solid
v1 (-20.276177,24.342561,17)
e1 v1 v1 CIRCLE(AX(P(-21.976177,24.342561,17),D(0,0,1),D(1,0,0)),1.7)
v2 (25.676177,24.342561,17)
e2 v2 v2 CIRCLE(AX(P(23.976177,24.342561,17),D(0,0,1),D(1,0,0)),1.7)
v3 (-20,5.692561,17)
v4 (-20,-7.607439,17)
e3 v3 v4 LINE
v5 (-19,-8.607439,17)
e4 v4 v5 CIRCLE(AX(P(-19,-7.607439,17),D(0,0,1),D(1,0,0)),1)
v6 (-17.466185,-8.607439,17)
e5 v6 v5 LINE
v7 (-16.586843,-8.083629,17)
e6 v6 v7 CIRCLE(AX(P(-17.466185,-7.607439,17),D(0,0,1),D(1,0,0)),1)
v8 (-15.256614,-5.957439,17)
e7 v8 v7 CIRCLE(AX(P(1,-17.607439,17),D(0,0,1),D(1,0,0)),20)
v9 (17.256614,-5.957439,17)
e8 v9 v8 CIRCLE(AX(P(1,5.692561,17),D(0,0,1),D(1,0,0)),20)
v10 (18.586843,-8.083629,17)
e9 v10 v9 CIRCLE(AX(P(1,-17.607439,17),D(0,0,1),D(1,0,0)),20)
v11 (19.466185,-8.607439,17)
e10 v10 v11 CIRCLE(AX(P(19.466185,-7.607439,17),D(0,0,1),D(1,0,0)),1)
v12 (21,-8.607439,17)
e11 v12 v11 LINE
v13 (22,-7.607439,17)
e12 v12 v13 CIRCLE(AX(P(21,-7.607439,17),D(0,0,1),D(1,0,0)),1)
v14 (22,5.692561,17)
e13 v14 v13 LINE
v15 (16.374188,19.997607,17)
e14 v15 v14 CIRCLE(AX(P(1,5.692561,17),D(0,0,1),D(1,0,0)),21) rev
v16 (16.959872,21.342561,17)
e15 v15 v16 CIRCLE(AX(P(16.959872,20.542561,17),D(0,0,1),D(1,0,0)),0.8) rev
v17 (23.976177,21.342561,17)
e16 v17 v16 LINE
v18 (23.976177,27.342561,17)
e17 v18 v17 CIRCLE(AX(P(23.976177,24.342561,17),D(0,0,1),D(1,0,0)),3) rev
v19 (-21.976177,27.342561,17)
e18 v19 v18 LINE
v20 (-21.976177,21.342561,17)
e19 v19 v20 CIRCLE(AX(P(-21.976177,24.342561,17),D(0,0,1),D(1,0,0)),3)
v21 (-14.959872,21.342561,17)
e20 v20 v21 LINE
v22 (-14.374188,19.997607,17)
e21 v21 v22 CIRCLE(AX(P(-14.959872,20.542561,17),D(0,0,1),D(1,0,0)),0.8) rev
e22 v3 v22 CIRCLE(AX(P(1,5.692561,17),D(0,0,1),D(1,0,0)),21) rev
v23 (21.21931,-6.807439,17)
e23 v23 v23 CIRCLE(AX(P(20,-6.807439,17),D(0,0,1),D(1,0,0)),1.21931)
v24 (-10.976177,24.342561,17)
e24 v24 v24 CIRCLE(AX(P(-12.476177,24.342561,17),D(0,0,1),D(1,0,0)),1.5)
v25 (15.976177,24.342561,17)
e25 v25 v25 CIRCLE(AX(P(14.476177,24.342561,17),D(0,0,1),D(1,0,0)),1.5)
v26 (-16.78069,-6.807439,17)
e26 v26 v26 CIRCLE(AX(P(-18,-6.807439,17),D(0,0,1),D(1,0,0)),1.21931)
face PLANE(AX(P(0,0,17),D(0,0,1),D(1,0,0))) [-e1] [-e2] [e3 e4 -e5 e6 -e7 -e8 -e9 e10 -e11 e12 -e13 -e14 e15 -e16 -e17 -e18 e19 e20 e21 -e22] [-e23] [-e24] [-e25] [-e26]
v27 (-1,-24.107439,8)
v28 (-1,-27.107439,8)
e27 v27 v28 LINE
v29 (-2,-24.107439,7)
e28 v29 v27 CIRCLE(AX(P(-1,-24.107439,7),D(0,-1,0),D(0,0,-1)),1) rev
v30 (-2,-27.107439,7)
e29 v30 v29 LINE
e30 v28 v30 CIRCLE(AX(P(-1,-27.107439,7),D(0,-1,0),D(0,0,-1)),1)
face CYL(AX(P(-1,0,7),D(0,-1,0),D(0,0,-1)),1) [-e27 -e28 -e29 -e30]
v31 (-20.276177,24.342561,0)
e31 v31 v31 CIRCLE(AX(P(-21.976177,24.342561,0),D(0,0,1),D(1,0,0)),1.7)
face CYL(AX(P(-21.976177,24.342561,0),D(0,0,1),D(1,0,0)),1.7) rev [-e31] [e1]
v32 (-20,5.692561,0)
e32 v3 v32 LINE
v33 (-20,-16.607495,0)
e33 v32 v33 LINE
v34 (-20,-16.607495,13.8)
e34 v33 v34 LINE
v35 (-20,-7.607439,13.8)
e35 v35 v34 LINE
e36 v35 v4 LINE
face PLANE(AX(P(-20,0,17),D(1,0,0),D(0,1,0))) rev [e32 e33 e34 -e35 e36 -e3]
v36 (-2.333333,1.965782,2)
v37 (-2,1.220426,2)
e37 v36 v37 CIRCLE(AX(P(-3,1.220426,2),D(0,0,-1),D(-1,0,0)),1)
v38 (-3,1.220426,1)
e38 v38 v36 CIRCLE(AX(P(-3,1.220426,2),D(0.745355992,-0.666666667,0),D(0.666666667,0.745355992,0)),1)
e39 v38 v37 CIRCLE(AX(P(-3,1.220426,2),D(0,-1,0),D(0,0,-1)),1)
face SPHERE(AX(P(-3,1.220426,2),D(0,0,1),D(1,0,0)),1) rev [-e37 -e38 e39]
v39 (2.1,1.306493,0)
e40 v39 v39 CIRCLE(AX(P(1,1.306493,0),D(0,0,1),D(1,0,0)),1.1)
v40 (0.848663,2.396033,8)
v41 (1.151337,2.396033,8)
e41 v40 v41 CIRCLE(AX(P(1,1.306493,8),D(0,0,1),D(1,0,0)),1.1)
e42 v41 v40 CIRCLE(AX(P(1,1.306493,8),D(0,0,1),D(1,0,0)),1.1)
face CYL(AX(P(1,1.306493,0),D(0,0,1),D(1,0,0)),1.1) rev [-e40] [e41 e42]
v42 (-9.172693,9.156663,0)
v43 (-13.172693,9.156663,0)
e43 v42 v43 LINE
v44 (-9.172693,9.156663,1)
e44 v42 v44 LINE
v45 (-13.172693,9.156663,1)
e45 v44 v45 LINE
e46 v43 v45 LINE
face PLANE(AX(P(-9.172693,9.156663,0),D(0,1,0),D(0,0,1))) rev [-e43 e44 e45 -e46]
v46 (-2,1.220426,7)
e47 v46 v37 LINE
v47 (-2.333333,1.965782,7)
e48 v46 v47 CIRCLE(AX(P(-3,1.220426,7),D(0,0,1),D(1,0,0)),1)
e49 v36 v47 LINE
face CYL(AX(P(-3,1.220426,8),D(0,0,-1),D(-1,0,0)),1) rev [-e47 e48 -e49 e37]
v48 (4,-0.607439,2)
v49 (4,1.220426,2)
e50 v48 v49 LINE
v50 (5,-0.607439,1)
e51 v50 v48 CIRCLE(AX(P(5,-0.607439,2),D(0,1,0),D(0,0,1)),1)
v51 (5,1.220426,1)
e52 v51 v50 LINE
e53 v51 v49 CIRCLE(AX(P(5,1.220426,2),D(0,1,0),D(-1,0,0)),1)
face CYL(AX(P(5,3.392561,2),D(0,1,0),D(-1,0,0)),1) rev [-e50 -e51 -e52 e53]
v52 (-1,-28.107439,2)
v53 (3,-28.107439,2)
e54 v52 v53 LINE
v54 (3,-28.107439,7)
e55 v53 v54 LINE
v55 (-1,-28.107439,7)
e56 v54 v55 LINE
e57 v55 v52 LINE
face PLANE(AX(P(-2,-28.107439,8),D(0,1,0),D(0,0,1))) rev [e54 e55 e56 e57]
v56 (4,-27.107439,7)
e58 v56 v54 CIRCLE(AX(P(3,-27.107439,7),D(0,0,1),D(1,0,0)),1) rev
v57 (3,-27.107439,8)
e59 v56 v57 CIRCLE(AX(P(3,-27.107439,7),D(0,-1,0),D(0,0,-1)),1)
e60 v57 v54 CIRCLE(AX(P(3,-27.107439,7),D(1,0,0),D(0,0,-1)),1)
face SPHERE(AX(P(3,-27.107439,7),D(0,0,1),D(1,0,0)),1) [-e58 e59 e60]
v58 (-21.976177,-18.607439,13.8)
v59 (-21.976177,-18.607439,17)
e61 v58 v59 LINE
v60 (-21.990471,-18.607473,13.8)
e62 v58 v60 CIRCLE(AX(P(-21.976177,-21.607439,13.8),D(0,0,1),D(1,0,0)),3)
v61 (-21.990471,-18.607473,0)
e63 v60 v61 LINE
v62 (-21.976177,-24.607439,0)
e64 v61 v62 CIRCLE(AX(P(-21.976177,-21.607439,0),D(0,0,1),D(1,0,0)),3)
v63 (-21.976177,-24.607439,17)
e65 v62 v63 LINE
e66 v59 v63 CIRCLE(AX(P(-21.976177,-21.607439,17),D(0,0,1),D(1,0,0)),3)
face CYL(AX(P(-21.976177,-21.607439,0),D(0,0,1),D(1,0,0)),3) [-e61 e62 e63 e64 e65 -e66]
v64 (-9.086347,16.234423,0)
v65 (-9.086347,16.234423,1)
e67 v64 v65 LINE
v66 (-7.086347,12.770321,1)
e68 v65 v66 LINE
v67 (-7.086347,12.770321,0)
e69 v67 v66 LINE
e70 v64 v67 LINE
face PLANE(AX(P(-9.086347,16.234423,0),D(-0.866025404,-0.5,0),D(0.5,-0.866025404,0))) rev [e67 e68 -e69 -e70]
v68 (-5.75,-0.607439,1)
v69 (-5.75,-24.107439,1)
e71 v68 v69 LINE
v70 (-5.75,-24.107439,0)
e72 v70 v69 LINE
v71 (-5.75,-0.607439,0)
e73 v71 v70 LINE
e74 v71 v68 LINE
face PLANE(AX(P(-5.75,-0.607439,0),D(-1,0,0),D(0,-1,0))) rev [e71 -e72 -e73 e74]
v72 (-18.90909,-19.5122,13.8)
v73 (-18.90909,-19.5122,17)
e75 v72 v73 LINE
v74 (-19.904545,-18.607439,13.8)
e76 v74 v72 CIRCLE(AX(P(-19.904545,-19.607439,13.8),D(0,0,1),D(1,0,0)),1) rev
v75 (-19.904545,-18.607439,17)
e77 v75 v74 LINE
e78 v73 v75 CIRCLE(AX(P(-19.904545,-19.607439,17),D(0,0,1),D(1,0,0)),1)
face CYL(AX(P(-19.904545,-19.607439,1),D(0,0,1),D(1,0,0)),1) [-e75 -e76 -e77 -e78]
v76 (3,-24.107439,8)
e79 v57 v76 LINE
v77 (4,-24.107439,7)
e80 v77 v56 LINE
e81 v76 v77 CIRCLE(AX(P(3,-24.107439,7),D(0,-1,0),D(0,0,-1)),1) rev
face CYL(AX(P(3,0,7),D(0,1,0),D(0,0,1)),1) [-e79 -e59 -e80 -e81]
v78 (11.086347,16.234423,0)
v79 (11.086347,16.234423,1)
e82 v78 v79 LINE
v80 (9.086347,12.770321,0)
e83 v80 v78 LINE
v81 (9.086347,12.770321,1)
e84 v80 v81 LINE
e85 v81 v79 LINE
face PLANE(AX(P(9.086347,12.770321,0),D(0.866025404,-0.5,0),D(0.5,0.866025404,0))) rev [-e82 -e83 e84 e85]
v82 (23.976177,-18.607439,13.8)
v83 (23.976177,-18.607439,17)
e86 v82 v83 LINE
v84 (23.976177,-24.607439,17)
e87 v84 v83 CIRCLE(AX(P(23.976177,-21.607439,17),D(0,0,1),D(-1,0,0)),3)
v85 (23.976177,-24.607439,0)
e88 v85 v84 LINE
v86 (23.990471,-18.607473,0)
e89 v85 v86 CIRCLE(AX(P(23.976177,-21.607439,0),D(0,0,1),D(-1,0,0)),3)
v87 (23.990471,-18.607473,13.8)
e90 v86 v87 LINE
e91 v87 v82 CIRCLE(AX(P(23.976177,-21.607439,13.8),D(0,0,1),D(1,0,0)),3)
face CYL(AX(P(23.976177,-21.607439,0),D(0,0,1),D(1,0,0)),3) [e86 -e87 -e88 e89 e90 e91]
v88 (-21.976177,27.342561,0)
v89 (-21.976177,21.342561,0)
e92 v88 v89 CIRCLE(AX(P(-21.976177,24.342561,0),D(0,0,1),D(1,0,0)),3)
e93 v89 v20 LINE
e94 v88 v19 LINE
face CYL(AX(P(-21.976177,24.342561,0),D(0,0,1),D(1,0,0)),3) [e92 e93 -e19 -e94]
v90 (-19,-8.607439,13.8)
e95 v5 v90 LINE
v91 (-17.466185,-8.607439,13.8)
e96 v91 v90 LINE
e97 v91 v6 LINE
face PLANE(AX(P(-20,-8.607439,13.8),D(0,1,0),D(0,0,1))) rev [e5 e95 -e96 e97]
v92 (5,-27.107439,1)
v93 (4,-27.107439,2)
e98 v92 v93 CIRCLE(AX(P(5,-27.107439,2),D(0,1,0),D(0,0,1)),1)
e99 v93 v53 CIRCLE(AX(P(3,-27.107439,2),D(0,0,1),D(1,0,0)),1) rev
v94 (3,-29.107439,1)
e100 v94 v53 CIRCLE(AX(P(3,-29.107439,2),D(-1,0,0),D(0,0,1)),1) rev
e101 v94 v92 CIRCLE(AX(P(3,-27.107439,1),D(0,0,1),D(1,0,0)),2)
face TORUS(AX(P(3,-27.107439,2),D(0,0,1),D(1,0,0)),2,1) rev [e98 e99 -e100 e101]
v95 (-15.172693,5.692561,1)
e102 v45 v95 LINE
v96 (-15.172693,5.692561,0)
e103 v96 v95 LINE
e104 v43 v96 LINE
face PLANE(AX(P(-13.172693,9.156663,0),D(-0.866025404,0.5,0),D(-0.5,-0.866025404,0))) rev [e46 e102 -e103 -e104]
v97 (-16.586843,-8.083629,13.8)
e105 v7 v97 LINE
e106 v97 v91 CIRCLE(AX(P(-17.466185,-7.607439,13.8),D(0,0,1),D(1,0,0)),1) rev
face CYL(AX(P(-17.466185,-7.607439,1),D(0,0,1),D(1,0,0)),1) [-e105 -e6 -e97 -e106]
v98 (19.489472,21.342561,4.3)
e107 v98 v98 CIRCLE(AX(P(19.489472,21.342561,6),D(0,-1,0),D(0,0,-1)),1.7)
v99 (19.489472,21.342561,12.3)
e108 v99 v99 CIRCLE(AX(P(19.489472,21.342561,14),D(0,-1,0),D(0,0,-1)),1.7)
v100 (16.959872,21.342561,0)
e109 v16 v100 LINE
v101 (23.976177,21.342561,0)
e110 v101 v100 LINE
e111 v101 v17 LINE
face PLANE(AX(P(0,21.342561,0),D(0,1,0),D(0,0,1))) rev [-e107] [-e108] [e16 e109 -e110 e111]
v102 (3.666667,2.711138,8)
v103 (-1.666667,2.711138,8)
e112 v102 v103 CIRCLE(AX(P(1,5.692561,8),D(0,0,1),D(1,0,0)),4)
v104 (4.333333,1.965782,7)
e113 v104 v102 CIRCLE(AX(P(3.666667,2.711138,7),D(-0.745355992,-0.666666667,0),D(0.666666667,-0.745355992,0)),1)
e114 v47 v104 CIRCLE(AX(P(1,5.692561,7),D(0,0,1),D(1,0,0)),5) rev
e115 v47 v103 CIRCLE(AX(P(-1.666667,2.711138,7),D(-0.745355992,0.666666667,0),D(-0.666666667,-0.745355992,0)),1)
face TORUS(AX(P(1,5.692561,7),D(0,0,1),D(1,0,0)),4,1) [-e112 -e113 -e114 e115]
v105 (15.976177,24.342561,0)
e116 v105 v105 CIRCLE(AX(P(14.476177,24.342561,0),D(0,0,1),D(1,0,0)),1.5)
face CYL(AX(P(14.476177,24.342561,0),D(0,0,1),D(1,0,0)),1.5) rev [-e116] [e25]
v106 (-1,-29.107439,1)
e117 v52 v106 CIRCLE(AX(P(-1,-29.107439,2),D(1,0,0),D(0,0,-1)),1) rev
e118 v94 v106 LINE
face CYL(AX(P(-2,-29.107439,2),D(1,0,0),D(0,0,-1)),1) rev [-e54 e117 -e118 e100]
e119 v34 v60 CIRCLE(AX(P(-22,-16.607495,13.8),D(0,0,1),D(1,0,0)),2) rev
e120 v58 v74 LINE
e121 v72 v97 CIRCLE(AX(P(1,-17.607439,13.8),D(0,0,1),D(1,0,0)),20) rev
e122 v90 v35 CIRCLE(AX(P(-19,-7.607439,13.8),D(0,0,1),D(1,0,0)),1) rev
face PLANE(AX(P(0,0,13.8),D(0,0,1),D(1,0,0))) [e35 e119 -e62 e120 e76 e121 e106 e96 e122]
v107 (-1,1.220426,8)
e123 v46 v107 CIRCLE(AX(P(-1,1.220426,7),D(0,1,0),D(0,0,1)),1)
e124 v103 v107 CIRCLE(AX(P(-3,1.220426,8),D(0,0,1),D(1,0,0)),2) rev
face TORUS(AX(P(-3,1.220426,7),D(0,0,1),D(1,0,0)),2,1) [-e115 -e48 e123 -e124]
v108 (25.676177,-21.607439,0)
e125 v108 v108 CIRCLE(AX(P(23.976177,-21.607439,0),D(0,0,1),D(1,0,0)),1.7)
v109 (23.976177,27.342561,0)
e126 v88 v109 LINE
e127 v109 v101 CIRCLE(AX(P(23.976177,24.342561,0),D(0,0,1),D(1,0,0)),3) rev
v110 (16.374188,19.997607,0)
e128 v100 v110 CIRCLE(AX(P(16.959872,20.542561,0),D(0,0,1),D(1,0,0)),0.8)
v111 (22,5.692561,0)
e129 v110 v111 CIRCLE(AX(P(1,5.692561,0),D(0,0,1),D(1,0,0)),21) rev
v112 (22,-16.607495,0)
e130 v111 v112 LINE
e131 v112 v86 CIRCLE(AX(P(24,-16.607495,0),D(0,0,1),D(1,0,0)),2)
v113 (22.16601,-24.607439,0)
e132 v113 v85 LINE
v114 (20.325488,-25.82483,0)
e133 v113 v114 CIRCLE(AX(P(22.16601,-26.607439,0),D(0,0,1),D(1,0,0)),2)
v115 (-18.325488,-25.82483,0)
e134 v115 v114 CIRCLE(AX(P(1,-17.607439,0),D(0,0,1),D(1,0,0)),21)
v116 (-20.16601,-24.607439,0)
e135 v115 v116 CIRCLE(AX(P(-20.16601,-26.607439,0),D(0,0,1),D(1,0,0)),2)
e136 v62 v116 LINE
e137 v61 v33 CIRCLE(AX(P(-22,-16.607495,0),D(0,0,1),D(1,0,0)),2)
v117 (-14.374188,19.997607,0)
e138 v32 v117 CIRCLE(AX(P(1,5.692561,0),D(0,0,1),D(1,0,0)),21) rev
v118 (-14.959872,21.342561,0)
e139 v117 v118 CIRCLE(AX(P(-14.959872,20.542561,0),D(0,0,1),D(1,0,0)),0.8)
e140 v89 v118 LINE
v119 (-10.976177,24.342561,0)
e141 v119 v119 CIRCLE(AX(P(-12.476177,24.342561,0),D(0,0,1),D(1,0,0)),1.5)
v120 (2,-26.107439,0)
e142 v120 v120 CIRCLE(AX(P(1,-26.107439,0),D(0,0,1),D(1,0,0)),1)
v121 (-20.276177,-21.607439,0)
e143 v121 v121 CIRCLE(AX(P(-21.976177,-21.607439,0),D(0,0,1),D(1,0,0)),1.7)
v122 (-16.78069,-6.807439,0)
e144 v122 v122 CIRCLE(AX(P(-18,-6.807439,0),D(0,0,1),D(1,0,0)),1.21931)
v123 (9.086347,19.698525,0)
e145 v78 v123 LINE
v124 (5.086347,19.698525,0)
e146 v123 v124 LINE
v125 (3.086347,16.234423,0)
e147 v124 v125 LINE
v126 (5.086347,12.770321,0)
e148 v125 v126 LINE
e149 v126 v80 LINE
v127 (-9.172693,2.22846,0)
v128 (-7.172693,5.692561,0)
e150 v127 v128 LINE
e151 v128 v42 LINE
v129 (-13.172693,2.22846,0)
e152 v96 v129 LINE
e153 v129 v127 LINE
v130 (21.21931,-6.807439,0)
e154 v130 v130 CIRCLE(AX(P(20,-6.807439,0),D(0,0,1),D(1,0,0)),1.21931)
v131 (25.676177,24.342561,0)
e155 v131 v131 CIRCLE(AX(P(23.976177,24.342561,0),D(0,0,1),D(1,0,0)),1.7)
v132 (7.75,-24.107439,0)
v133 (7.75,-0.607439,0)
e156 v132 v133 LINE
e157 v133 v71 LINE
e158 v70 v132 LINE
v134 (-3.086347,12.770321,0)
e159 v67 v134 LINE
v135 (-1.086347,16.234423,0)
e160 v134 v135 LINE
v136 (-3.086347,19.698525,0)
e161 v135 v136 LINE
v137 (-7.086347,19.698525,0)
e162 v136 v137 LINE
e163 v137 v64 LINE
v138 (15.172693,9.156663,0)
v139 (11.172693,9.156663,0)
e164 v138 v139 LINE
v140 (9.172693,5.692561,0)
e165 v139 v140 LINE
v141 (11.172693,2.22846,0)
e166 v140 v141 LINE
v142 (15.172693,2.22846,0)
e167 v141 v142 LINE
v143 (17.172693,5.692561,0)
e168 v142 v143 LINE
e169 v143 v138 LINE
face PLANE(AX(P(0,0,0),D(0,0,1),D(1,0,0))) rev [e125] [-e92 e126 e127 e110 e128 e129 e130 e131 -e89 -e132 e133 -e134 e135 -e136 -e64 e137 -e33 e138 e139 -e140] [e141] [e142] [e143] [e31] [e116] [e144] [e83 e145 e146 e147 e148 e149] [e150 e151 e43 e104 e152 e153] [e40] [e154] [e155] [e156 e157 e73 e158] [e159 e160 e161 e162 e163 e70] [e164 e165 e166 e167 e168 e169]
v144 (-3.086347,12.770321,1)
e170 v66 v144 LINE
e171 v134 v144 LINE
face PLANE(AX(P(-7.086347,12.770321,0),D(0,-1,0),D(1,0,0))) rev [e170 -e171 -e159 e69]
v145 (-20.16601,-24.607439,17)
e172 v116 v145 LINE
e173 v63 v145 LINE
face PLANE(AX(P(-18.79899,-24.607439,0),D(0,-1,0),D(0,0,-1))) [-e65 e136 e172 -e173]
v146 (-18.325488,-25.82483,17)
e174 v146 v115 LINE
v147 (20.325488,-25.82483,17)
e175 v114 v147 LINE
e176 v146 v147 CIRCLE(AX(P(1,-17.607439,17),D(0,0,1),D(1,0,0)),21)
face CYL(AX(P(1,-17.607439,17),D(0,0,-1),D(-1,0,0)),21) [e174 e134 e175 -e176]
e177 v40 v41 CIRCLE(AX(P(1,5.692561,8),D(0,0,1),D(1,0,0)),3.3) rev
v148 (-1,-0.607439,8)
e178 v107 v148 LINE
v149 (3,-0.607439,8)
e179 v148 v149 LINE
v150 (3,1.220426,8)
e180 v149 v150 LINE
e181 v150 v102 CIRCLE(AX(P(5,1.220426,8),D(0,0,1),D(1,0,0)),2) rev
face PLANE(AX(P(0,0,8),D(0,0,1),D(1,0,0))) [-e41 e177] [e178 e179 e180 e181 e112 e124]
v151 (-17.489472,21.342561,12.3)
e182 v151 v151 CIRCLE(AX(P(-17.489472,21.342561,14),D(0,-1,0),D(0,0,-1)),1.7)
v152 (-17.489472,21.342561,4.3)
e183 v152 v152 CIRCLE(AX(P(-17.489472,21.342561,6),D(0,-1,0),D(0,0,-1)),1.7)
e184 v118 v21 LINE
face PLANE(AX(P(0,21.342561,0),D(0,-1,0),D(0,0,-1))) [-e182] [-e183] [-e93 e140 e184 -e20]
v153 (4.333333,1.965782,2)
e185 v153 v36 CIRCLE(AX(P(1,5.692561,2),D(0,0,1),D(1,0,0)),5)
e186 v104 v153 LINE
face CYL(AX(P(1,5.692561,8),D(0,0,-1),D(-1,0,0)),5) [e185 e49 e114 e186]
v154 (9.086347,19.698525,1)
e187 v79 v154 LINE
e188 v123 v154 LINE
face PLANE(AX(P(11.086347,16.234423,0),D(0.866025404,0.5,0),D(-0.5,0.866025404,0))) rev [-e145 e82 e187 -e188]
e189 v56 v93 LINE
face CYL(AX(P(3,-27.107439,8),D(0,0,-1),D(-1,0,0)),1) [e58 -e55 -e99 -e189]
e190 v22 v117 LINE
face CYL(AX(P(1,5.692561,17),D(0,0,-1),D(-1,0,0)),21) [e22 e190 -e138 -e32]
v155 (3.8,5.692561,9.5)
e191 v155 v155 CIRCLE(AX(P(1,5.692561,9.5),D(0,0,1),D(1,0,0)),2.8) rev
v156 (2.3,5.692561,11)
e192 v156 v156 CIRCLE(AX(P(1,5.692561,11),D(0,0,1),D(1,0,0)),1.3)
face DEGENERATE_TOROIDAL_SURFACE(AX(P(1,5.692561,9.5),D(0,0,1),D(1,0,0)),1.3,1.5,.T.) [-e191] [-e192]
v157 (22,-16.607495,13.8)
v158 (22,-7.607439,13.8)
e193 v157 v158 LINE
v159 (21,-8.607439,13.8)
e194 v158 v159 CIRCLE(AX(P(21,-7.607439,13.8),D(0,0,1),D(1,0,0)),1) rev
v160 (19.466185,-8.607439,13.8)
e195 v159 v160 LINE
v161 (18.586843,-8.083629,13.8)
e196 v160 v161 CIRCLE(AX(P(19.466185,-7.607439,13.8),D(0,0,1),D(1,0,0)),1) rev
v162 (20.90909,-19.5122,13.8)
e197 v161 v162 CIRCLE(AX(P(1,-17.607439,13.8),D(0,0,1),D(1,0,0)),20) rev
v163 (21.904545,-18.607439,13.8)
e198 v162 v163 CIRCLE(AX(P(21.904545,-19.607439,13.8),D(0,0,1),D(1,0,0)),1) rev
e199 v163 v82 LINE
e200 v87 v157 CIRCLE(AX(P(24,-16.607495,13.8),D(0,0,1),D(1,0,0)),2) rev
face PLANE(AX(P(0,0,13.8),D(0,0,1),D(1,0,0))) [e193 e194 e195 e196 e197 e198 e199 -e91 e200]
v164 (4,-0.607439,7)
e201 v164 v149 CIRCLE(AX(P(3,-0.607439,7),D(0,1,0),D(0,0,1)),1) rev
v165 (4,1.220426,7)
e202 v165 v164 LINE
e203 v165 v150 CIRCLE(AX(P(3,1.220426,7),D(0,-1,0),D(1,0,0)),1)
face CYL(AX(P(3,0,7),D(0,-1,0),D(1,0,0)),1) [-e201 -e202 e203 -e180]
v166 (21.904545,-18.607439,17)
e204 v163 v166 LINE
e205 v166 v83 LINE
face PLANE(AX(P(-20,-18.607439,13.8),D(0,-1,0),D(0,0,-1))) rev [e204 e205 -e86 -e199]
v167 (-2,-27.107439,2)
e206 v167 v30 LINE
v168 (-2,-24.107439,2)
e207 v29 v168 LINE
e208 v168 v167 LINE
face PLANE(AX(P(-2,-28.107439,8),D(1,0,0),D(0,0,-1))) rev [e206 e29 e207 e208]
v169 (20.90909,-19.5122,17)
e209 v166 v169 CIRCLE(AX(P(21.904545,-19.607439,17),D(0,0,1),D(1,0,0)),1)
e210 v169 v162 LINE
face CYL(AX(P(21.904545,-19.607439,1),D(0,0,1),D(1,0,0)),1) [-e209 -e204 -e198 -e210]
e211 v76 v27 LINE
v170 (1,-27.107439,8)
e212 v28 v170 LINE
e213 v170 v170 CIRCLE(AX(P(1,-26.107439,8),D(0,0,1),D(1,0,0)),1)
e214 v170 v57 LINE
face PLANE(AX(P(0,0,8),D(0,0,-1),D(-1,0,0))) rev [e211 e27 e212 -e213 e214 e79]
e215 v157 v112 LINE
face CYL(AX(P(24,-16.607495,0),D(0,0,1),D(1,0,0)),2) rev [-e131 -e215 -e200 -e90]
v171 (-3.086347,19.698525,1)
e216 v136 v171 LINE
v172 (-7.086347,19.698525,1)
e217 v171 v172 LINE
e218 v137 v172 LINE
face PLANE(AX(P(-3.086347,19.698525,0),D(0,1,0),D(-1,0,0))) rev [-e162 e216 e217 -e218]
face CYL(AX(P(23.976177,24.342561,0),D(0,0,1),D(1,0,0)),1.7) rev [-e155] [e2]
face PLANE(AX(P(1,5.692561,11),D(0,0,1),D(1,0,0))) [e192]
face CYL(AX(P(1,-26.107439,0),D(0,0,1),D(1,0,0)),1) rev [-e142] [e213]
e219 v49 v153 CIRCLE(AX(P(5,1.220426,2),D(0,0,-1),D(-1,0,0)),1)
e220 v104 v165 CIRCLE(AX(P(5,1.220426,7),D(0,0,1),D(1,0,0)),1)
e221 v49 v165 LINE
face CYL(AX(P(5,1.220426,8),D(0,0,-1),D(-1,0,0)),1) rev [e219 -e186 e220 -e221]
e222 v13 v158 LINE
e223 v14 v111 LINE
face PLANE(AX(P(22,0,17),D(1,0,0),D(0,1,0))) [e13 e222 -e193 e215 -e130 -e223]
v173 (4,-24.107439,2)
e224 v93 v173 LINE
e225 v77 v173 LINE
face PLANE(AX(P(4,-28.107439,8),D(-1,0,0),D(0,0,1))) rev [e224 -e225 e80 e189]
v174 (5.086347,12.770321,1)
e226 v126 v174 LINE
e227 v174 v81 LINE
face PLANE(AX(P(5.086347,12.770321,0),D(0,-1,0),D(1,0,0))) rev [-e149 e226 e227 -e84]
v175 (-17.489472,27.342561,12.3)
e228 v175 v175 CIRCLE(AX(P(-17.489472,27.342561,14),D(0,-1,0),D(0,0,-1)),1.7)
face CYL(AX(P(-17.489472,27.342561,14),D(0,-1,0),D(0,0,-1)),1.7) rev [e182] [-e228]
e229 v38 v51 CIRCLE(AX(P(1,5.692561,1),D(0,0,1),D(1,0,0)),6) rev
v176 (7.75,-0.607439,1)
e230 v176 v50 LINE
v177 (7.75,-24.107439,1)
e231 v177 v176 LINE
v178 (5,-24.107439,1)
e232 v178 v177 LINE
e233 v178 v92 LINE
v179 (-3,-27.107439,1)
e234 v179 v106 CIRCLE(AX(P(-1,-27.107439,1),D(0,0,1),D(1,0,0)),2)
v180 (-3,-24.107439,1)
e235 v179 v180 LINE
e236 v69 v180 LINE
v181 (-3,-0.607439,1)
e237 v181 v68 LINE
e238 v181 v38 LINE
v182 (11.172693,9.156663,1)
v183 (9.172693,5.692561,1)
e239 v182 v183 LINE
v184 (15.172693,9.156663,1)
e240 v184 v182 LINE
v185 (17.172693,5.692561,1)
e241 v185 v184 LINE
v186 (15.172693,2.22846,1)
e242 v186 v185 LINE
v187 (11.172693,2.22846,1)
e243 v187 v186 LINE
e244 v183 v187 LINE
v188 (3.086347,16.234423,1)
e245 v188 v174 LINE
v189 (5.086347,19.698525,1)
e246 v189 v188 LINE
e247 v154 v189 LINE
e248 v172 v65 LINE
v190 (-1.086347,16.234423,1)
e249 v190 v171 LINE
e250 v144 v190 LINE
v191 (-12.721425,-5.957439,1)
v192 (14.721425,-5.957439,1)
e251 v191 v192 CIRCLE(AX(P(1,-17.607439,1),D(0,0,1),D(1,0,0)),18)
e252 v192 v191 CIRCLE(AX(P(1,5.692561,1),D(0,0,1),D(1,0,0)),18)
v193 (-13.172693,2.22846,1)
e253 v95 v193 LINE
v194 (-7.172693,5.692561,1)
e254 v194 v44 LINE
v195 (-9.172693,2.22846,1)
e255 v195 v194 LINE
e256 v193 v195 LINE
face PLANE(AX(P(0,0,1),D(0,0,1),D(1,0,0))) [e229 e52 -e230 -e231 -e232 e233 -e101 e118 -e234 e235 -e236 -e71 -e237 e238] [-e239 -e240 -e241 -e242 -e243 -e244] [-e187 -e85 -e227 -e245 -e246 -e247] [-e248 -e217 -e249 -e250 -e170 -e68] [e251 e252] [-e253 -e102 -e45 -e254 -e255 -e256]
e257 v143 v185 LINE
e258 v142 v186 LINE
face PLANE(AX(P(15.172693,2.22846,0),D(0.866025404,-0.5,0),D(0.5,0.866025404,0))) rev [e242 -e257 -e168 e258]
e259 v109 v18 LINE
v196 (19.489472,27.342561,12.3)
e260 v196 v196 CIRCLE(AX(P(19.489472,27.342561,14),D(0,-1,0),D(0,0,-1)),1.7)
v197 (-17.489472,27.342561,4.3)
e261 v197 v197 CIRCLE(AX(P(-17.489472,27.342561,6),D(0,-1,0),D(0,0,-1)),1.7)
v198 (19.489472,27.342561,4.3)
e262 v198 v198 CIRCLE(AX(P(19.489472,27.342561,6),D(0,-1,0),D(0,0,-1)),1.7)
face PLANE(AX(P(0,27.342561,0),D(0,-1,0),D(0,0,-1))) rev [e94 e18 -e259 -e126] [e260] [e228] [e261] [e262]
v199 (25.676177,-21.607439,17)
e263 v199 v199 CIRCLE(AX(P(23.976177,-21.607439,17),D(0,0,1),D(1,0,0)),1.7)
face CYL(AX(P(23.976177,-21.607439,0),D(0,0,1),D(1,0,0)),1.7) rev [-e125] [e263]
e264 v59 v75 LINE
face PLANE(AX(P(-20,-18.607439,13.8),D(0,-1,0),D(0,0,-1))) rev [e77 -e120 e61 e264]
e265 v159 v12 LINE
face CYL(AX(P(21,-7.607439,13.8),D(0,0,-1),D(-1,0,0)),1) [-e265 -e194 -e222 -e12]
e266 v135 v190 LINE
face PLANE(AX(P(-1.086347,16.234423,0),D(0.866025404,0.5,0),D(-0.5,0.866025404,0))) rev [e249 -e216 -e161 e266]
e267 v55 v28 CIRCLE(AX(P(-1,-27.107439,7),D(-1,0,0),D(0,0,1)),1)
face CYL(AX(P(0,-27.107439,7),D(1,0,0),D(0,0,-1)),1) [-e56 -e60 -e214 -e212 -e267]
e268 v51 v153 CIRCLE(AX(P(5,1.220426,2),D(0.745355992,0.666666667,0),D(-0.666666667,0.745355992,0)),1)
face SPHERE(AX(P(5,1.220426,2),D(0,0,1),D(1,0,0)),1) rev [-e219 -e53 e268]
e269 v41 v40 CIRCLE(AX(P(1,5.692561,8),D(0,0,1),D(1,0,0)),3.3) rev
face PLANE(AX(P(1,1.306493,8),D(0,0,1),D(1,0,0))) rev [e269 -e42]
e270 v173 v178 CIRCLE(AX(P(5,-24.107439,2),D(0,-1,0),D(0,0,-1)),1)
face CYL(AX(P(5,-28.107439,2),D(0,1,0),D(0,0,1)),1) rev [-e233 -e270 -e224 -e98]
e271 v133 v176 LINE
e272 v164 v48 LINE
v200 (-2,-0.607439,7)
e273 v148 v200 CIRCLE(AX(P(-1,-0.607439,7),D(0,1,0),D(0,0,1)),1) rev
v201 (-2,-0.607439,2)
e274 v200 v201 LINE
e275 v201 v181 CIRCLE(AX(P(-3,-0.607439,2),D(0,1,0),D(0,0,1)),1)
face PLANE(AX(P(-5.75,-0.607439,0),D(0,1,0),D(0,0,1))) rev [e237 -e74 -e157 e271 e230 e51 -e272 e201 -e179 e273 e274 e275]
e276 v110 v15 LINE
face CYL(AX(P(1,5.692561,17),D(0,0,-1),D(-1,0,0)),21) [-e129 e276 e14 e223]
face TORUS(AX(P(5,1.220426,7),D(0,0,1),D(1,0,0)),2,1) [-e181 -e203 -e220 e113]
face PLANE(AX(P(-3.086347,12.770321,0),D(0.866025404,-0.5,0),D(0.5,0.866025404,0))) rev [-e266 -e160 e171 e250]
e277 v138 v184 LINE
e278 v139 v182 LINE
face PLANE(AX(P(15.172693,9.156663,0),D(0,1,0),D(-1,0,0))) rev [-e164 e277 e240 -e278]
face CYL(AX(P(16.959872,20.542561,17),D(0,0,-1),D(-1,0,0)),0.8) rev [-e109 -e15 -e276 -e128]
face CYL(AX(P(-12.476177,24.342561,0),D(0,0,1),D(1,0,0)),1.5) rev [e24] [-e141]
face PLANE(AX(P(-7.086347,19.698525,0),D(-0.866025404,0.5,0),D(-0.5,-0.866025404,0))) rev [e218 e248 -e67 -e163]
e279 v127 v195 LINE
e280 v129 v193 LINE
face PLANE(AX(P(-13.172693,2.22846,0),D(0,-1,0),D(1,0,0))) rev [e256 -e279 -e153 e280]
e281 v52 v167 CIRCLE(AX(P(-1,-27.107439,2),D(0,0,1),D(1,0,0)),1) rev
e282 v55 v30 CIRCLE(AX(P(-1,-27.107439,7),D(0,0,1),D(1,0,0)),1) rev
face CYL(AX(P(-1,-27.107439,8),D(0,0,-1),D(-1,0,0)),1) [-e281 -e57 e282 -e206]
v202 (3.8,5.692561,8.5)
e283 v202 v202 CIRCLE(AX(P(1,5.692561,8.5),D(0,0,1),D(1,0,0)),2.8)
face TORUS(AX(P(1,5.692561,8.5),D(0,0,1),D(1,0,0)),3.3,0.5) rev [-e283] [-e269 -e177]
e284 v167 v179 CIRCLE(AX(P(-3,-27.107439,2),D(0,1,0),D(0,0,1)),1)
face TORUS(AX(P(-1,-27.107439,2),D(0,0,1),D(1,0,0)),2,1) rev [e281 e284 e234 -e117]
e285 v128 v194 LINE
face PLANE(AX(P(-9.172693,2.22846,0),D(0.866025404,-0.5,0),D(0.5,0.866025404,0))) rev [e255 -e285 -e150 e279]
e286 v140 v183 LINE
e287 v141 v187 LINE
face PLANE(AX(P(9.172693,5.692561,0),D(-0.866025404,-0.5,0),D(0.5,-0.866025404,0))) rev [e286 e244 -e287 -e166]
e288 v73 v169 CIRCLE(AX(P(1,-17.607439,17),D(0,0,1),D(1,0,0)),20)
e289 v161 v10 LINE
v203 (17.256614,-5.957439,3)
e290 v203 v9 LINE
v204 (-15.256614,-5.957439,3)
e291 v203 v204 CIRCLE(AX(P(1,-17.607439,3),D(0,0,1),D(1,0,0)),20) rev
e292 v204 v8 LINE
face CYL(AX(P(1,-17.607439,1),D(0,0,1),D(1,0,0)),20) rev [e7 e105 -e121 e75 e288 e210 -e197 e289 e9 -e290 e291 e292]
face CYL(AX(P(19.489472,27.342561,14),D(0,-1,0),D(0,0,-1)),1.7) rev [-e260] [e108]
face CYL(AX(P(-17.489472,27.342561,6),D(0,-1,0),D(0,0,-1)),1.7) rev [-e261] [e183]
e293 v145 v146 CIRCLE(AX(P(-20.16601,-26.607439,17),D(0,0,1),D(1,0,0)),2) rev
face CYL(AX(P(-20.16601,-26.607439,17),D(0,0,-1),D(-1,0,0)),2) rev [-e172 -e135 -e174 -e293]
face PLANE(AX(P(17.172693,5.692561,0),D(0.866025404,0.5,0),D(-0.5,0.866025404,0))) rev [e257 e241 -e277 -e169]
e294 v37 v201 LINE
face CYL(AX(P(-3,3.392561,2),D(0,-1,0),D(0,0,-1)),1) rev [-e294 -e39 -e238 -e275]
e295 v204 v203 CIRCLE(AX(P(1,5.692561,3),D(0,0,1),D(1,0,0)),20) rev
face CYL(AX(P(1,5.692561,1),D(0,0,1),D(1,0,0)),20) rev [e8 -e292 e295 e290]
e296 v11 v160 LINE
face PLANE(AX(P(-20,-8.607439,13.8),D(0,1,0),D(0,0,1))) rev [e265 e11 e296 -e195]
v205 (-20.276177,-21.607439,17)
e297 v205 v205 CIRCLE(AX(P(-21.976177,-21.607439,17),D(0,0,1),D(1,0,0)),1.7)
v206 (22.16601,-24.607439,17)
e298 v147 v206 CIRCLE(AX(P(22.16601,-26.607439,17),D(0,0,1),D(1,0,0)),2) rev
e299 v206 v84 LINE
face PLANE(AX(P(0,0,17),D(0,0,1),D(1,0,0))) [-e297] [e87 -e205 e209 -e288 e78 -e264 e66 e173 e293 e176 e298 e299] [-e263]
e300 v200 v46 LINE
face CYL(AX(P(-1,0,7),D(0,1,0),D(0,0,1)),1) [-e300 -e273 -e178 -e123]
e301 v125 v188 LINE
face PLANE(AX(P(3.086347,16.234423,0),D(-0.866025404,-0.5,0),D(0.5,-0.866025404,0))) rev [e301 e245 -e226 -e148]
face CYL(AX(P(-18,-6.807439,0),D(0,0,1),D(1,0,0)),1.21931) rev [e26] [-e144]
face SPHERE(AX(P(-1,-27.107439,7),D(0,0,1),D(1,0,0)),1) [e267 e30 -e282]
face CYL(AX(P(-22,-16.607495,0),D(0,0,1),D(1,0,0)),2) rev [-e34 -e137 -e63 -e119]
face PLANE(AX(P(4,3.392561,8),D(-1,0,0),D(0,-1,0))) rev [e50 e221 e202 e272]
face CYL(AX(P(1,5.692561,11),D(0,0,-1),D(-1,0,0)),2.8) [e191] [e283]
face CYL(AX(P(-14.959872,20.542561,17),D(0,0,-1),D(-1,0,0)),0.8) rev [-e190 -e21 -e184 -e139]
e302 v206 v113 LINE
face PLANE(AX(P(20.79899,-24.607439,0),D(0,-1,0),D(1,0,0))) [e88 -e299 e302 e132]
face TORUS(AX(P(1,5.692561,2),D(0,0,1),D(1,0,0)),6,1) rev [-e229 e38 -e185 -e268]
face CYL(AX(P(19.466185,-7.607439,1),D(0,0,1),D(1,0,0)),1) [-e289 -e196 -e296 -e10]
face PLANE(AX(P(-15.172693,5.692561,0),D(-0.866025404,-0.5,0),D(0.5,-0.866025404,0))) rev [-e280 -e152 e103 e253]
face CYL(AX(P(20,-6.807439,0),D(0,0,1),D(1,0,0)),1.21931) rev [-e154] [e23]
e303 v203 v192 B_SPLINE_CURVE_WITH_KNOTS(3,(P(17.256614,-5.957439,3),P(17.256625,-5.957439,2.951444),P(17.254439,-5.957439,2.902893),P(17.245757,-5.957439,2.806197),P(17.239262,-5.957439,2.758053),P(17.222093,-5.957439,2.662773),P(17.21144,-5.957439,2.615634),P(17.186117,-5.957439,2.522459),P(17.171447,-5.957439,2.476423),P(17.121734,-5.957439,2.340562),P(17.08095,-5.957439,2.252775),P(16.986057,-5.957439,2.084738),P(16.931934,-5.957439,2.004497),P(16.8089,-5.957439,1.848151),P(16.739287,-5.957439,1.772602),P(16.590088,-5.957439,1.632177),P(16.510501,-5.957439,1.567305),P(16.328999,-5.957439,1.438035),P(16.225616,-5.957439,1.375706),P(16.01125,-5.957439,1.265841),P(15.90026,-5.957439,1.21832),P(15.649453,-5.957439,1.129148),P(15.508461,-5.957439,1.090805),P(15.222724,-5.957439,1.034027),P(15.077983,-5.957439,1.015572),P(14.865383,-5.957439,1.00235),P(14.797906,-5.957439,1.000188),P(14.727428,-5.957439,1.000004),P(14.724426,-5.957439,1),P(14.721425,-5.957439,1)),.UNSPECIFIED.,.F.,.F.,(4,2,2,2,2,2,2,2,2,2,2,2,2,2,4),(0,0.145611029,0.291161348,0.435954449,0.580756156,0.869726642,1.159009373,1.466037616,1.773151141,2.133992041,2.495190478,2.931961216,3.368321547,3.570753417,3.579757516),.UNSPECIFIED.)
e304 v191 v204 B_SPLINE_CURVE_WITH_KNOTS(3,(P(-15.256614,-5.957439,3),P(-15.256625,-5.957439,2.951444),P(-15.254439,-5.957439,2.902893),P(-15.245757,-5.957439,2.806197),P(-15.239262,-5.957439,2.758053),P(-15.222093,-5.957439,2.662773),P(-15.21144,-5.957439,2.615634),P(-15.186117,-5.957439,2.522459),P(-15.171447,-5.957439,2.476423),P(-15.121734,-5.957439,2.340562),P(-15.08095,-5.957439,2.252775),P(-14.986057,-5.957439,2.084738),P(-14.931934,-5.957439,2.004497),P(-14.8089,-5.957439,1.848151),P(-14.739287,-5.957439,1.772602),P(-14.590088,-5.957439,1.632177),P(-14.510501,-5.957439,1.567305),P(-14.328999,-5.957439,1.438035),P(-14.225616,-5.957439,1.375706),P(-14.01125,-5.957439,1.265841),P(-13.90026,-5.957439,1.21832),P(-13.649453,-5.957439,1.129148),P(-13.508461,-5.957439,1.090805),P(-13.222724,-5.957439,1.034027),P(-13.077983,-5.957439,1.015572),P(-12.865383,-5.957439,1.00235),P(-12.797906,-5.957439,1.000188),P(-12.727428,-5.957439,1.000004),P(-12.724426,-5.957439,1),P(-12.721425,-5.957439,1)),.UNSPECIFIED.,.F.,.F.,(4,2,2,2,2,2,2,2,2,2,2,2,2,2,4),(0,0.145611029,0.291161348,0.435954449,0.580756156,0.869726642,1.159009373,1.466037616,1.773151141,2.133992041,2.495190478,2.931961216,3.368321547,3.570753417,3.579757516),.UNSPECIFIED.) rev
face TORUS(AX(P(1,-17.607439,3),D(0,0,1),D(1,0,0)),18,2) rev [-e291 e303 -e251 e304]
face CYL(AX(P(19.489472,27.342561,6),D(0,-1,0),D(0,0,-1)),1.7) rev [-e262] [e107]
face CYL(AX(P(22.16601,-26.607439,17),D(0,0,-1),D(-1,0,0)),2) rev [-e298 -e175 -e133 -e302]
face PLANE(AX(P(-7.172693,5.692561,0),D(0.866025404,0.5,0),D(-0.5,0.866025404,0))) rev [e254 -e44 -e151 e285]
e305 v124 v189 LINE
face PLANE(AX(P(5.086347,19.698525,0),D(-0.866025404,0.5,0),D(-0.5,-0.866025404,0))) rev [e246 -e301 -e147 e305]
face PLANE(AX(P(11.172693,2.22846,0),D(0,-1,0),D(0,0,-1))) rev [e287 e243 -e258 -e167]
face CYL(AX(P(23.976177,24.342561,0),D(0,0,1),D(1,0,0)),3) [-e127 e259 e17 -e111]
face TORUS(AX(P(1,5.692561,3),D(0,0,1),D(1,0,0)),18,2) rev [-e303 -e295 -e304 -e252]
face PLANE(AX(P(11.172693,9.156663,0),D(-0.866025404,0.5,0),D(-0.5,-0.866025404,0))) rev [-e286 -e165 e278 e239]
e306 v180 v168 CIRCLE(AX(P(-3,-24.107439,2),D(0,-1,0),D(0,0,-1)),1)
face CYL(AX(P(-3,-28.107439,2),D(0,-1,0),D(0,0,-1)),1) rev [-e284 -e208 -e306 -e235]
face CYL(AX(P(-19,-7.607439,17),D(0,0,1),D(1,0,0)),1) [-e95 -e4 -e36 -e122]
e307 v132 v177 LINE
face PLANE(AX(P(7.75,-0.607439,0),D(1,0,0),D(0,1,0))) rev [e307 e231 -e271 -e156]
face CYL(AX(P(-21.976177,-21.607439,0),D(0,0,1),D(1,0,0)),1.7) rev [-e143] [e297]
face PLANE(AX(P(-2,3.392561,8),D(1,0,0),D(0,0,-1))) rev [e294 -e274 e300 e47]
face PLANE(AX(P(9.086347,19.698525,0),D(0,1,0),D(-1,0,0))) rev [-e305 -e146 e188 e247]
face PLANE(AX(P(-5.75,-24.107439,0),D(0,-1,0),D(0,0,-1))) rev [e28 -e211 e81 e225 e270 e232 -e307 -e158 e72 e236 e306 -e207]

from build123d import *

# Parameters (mm, degrees)
BODY_DEPTH                      = 17
MAIN_BOX_R                      = 20
BOX_DEPTH                       = 16
RACK_CH_DEPTH                   = 3.2
VERRUNDUNG1_R                   = 1
WINGS_START                     = -17
WINGS_DEPTH                     = 17
SKIZZE6_R                       = 1.6999999999999995
WING_HOLE_DEPTH                 = 51.072431865933915
VERRUNDUNG2_R                   = 2
VERRUNDUNG3_R                   = 2
SERVO_HOLE_DEPTH                = 50.74181774893831
SKIZZE8_W                       = 6
SKIZZE8_H                       = 4
SKIZZE8_W_2                     = 5.999999999999996
SERVO_BORE_DEPTH                = 7
SKIZZE10_R                      = 5.000000000000001
GEAR_HOLDER_DEPTH               = 7
MAIN_GEAR_AXIS_R                = 2.8
AXIS_DEPTH                      = 3
VERRUNDUNG11_R                  = 1.5
VERRUNDUNG12_R                  = 0.5
VERRUNDUNG13_R                  = 1
SCREW_HOLE_R                    = 1.0000000000000009
SCREW_HOLE_R_2                  = 1.1000000000000003
SERVO_HOLDER_HOLE_DEPTH         = 48.950478964955025
VERRUNDUNG14_R                  = 1
VERRUNDUNG17_R                  = 1
VERRUNDUNG18_R                  = 2
VERRUNDUNG19_R                  = 1
VERRUNDUNG20_R                  = 1
SCHNITT_LINEAR_AUSTRAGEN1_DEPTH = 50.74181774893831
KREISMUSTER1_COUNT              = 4
KREISMUSTER1_ANGLE              = 180.0000000000004
SKIZZE13_R                      = 1.2193098216311076
SCHNITT_LINEAR_AUSTRAGEN2_DEPTH = 51.072431865933915
BASE_START                      = -17
BASE_WINGS_R                    = 1.6999999999999995
BASE_DEPTH                      = 17
SKIZZE15_R                      = 1.6999999999999995
BASE_HOLES_DEPTH                = 68.90225786791508
VERRUNDUNG22_R                  = 0.8
SKIZZE16_R                      = 1.5000000000000009
SCHNITT_LINEAR_AUSTRAGEN4_DEPTH = 51.072431865933915


with BuildPart() as part:
    # groundplate → body (new body)
    with BuildSketch(Plane.XY):
        with BuildLine():
            Line((22, 5.692561475698), (22.000000000000004, -17.607438524302047))
            ThreePointArc((22.000000000000004, -17.607438524302047), (0.9999999999999785, -38.607438524302005), (-20, -17.607438524302008))
            Line((-20, -17.607438524302008), (-20.000000000000004, 5.692561475697993))
            ThreePointArc((-20.000000000000004, 5.692561475697993), (0.999999999999994, 26.692561475697996), (22, 5.692561475698))
        make_face()
    extrude(amount=BODY_DEPTH)

    # main-box → box (cut)
    with BuildSketch(Plane.XY.offset(17)):
        with Locations((0.9999999999999974, 5.692561475697993)):
            Circle(MAIN_BOX_R)
        with Locations((1.0000000000000009, -17.607438524302005)):
            Circle(MAIN_BOX_R)
    extrude(amount=-BOX_DEPTH, mode=Mode.SUBTRACT)

    # rack-channel → rack-ch (cut)
    with BuildSketch(Plane.XY.offset(17)):
        Polygon((-20.000000000000007, -8.607438524302008), (21.999999999999996, -8.607438524302008), (22, -18.607438524302008), (-20.000000000000004, -18.607438524302008), align=None)
    extrude(amount=-RACK_CH_DEPTH, mode=Mode.SUBTRACT)

    # Verrundung1
    verrundung1_edges = [part.edges().sort_by_distance(p)[0] for p in [
        (21.999999999999996, -8.607438524302008, 15.4),
        (-20.000000000000007, -8.607438524302008, 15.4),
    ]]
    fillet(verrundung1_edges, radius=VERRUNDUNG1_R)

    # wings 2 → wings (add)
    with BuildSketch(Plane.XY.offset(17).offset(WINGS_START)):
        with BuildLine():
            Line((-19.97617696340303, -18.607438524302008), (-21.97617696340303, -18.607438524302008))
            ThreePointArc((-21.97617696340303, -18.607438524302008), (-24.97617696340303, -21.607438524302008), (-21.97617696340303, -24.607438524302008))
            Line((-21.97617696340303, -24.607438524302008), (-18.798989873223324, -24.607438524302008))
            ThreePointArc((-18.798989873223324, -24.607438524302008), (-19.60712395359135, -21.65051190495212), (-19.97617696340303, -18.607438524302008))
        make_face()
        with BuildLine():
            Line((21.976176963403017, -18.607438524302008), (23.97617696340302, -18.607438524302008))
            ThreePointArc((23.97617696340302, -18.607438524302008), (26.97617696340302, -21.607438524302008), (23.97617696340302, -24.607438524302008))
            Line((23.97617696340302, -24.607438524302008), (20.798989873223324, -24.607438524302))
            ThreePointArc((20.798989873223324, -24.607438524302), (21.60712395359134, -21.650511904952104), (21.976176963403017, -18.607438524302008))
        make_face()
    extrude(amount=WINGS_DEPTH)

    # Skizze6 → wing-hole (cut, through all)
    with BuildSketch(Plane.XY.offset(17)):
        with Locations((-21.97617696340303, -21.607438524302008)):
            Circle(SKIZZE6_R)
        with Locations((23.97617696340302, -21.607438524302008)):
            Circle(SKIZZE6_R)
    extrude(amount=-WING_HOLE_DEPTH, mode=Mode.SUBTRACT)

    # Verrundung2
    verrundung2_edges = [part.edges().sort_by_distance(p)[0] for p in [
        (-18.798989873223324, -24.607438524302008, 8.5),
        (20.798989873223327, -24.607438524302005, 8.5),
    ]]
    fillet(verrundung2_edges, radius=VERRUNDUNG2_R)

    # Verrundung3
    # the kernel refuses this fillet: 2 mm, written as the material it adds along each edge
    with BuildSketch(Plane(origin=(-19.97617696340303, -18.607438524302008, 0), x_dir=(-0.999999999857104, -1.6905387508807606e-05, 0), z_dir=(0, 0, 1))) as verrundung3_piece_1:
        with BuildLine():
            CenterArc((2.0237892264922044, -1.9999774591975295), VERRUNDUNG3_R, 90.27202431598047, 89.72700707666411)
            Line((0.02378922677799618, -1.9999436484225084), (-0.17621077319342388, -1.9999402673450066))
            ThreePointArc((-0.17621077319342388, -1.9999402673450066), (-0.17619386876536394, -0.999997021517264), (-0.19977327491231678, -0.00952043228054363))
            Line((-0.19977327491231678, -0.00952043228054363), (3.38107750176e-06, 0.1999999999714201))
            ThreePointArc((3.38107750176e-06, 0.1999999999714201), (2.0000033807917097, 0.19996618919640247), (2.0133442818213974, 0.19999774591975153))
            Line((2.0133442818213974, 0.19999774591975153), (2.0142938222460147, 0))
        make_face()
    extrude(amount=13.8)
    with BuildSketch(Plane(origin=(21.97617696340302, -18.60743852430201, 0), x_dir=(0.999999999857104, -1.690538750704377e-05, 0), z_dir=(0, 0, 1))) as verrundung3_piece_2:
        with BuildLine():
            CenterArc((2.0237892264922217, 1.9999774591975295), VERRUNDUNG3_R, 180.00096860735533, 89.727007076664)
            Line((0.02378922677801392, 1.999943648422512), (-0.17621077319340614, 1.9999402673450104))
            ThreePointArc((-0.17621077319340614, 1.9999402673450104), (-0.17619386876534796, 0.9999970215172324), (-0.19977327491231678, 0.00952043228054398))
            Line((-0.19977327491231678, 0.00952043228054398), (3.38107750141e-06, -0.1999999999714201))
            ThreePointArc((3.38107750141e-06, -0.1999999999714201), (2.0000033807917093, -0.19996618919640244), (2.0133442818214076, -0.19999774591975153))
            Line((2.0133442818214076, -0.19999774591975153), (2.0142938222460254, 0))
        make_face()
    extrude(amount=13.8)

    # servo-cut → servo-hole (cut, through all)
    with BuildSketch(Plane.XY.offset(1.0000000000000009)):
        Polygon((-5.750000000000006, -0.607438524302003), (7.749999999999994, -0.607438524302003), (7.749999999999993, -24.107438524302005), (-5.750000000000002, -24.107438524302005), align=None)
    extrude(amount=-SERVO_HOLE_DEPTH, mode=Mode.SUBTRACT)

    # Skizze8 → servo-bore (add)
    with BuildSketch(Plane.XY.offset(1.0000000000000009)):
        with Locations((0.9999999999999958, -26.107438524302005)):
            Rectangle(SKIZZE8_W, SKIZZE8_H)
        with Locations((0.9999999999999969, 1.3925614756979972)):
            Rectangle(SKIZZE8_W_2, SKIZZE8_H)
    extrude(amount=SERVO_BORE_DEPTH)

    # Skizze10 → gear-holder (add)
    with BuildSketch(Plane.XY.offset(1.0000000000000009)):
        with Locations((0.9999999999999974, 5.692561475697993)):
            Circle(SKIZZE10_R)
    extrude(amount=GEAR_HOLDER_DEPTH)

    # main-gear-axis → axis (add)
    with BuildSketch(Plane.XY.offset(8)):
        with Locations((0.9999999999999974, 5.692561475697993)):
            Circle(MAIN_GEAR_AXIS_R)
    extrude(amount=AXIS_DEPTH)

    # Verrundung11
    verrundung11_edges = [part.edges().sort_by_distance(p)[0] for p in [
        (-1.8000000000000025, 5.692561475697993, 11),
    ]]
    fillet(verrundung11_edges, radius=VERRUNDUNG11_R)

    # Verrundung12
    verrundung12_edges = [part.edges().sort_by_distance(p)[0] for p in [
        (-1.8000000000000025, 5.692561475697993, 8),
    ]]
    fillet(verrundung12_edges, radius=VERRUNDUNG12_R)

    # Verrundung13
    verrundung13_edges = [part.edges().sort_by_distance(p)[0] for p in [
        (3.9999999999999942, 1.6925614756979899, 4.5),
        (-2.000000000000001, 1.6925614756979908, 4.5),
    ]]
    fillet(verrundung13_edges, radius=VERRUNDUNG13_R)

    # screw-hole → servo-holder-hole (cut, through all)
    with BuildSketch(Plane.XY.offset(8)):
        with Locations((0.9999999999999957, -26.107438524302)):
            Circle(SCREW_HOLE_R)
        with Locations((0.9999999999999954, 1.3064934981982024)):
            Circle(SCREW_HOLE_R_2)
    extrude(amount=-SERVO_HOLDER_HOLE_DEPTH, mode=Mode.SUBTRACT)

    # Verrundung14
    verrundung14_edges = [part.edges().sort_by_distance(p)[0] for p in [
        (3.9999999999999947, 0.30649349819820326, 1.0000000000000009),
        (3.9999999999999947, 0.30649349819820326, 8),
        (1.0000000000000022, 10.692561475697994, 8),
        (1.0000000000000022, 10.692561475697996, 1.0000000000000009),
        (-2.000000000000001, 0.30649349819820404, 1.0000000000000009),
        (-2.000000000000001, 0.30649349819820415, 8),
        (4.087129070824718, 1.6286738111622732, 1),
        (-2.087129070824725, 1.6286738111622772, 1),
        (-2.087129070824725, 1.6286738111622772, 8),
        (4.087129070824718, 1.6286738111622727, 8),
    ]]
    fillet(verrundung14_edges, radius=VERRUNDUNG14_R)

    # Verrundung17
    verrundung17_edges = [part.edges().sort_by_distance(p)[0] for p in [
        (3.9999999999999956, -26.107438524302005, 1.0000000000000009),
        (3.9999999999999956, -28.107438524302005, 4.500000000000001),
        (-2.0000000000000044, -26.107438524302005, 1.0000000000000009),
        (0.9999999999999956, -28.107438524302005, 1.0000000000000009),
        (-2.0000000000000044, -28.107438524302005, 4.500000000000001),
        (3.9999999999999956, -26.107438524302005, 8),
        (-2.0000000000000044, -26.107438524302005, 8),
        (0.9999999999999956, -28.107438524302005, 8),
    ]]
    fillet(verrundung17_edges, radius=VERRUNDUNG17_R)

    # Verrundung18
    verrundung18_edges = [part.edges().sort_by_distance(p)[0] for p in [
        (0.9999999999999956, -37.60743852430201, 1),
        (1.0000000000000062, 25.692561475697993, 1),
    ]]
    fillet(verrundung18_edges, radius=VERRUNDUNG18_R)

    # Verrundung19
    verrundung19_edges = [part.edges().sort_by_distance(p)[0] for p in [
        (18.860571099491754, -8.607438524302008, 15.4),
        (-16.860571099491754, -8.607438524302008, 15.4),
    ]]
    fillet(verrundung19_edges, radius=VERRUNDUNG19_R)

    # Verrundung20
    verrundung20_edges = [part.edges().sort_by_distance(p)[0] for p in [
        (20.974984355438178, -18.607438524302008, 15.4),
        (-18.974984355438178, -18.607438524302008, 15.4),
    ]]
    fillet(verrundung20_edges, radius=VERRUNDUNG20_R)

    # Skizze12 → Schnitt-Linear austragen1 (cut, through all)
    with BuildSketch(Plane.XY.offset(1.0000000000000009)):
        Polygon((-7.172693196347616, 5.692561475697853), (-9.172693196347614, 9.156663090835606), (-13.172693196347614, 9.156663090835606), (-15.172693196347614, 5.6925614756978495), (-13.172693196347614, 2.2284598605600965), (-9.172693196347614, 2.228459860560096), align=None)
    schnitt_linear_austragen1 = extrude(amount=-SCHNITT_LINEAR_AUSTRAGEN1_DEPTH, mode=Mode.SUBTRACT)

    # Kreismuster1: Schnitt-Linear austragen1 ×4 about axis
    kreismuster1_axis = Axis((1.0000000000000067, 5.692561475697992, 0), (0, 0, -1))
    for i in range(1, KREISMUSTER1_COUNT):
        add(schnitt_linear_austragen1.rotate(kreismuster1_axis, i * KREISMUSTER1_ANGLE / (KREISMUSTER1_COUNT - 1)), mode=Mode.SUBTRACT)

    # Skizze13 → Schnitt-Linear austragen2 (cut, through all)
    with BuildSketch(Plane.XY.offset(17)):
        with Locations((-18.000000000000004, -6.8074385243020075)):
            Circle(SKIZZE13_R)
        with Locations((19.999999999999996, -6.8074385243020075)):
            Circle(SKIZZE13_R)
    extrude(amount=-SCHNITT_LINEAR_AUSTRAGEN2_DEPTH, mode=Mode.SUBTRACT)

    # base-wings → base (add)
    with BuildSketch(Plane.XY.offset(17).offset(BASE_START)):
        with BuildLine():
            Line((15.002767583588609, 21.342561475697998), (23.97617696340302, 21.342561475697998))
            ThreePointArc((23.97617696340302, 21.342561475698), (26.976176963403017, 24.342561475697998), (23.97617696340302, 27.342561475697995))
            Line((23.976176963403017, 27.342561475697995), (-21.976176963403038, 27.342561475697995))
            ThreePointArc((-21.976176963403038, 27.342561475697998), (-24.976176963403034, 24.342561475697998), (-21.976176963403038, 21.342561475697998))
            Line((-21.976176963403038, 21.342561475697998), (-13.002767583588613, 21.342561475697998))
            ThreePointArc((-13.002767583588613, 21.342561475697998), (0.9999999999999996, 26.692561475697993), (15.00276758358861, 21.342561475697998))
        make_face()
        with Locations((-21.976176963403038, 24.342561475697998)):
            Circle(BASE_WINGS_R, mode=Mode.SUBTRACT)
        with Locations((23.97617696340302, 24.342561475697998)):
            Circle(BASE_WINGS_R, mode=Mode.SUBTRACT)
    extrude(amount=BASE_DEPTH)

    # Skizze15 → base-holes (cut, through all)
    with BuildSketch(Plane.XZ.offset(-21.342561475697998)):
        with Locations(Location((-17.489472273495824, 6, 0), (0, 0, 270))):
            Circle(SKIZZE15_R)
        with Locations(Location((-17.489472273495824, 14.000000000000002, 0), (0, 0, 270))):
            Circle(SKIZZE15_R)
        with Locations(Location((19.489472273495814, 14.000000000000005, 0), (0, 0, 270))):
            Circle(SKIZZE15_R)
        with Locations(Location((19.489472273495814, 5.999999999999999, 0), (0, 0, 270))):
            Circle(SKIZZE15_R)
    extrude(amount=-BASE_HOLES_DEPTH, mode=Mode.SUBTRACT)

    # Verrundung22
    verrundung22_edges = [part.edges().sort_by_distance(p)[0] for p in [
        (15.00276758358861, 21.342561475697998, 8.5),
        (-13.00276758358861, 21.342561475697998, 8.5),
    ]]
    fillet(verrundung22_edges, radius=VERRUNDUNG22_R)

    # Skizze16 → Schnitt-Linear austragen4 (cut, through all)
    with BuildSketch(Plane.XY.offset(17)):
        with Locations((14.476176963403017, 24.34256147569799)):
            Circle(SKIZZE16_R)
        with Locations((-12.476176963403036, 24.34256147569799)):
            Circle(SKIZZE16_R)
    extrude(amount=-SCHNITT_LINEAR_AUSTRAGEN4_DEPTH, mode=Mode.SUBTRACT)


solid = part.part
